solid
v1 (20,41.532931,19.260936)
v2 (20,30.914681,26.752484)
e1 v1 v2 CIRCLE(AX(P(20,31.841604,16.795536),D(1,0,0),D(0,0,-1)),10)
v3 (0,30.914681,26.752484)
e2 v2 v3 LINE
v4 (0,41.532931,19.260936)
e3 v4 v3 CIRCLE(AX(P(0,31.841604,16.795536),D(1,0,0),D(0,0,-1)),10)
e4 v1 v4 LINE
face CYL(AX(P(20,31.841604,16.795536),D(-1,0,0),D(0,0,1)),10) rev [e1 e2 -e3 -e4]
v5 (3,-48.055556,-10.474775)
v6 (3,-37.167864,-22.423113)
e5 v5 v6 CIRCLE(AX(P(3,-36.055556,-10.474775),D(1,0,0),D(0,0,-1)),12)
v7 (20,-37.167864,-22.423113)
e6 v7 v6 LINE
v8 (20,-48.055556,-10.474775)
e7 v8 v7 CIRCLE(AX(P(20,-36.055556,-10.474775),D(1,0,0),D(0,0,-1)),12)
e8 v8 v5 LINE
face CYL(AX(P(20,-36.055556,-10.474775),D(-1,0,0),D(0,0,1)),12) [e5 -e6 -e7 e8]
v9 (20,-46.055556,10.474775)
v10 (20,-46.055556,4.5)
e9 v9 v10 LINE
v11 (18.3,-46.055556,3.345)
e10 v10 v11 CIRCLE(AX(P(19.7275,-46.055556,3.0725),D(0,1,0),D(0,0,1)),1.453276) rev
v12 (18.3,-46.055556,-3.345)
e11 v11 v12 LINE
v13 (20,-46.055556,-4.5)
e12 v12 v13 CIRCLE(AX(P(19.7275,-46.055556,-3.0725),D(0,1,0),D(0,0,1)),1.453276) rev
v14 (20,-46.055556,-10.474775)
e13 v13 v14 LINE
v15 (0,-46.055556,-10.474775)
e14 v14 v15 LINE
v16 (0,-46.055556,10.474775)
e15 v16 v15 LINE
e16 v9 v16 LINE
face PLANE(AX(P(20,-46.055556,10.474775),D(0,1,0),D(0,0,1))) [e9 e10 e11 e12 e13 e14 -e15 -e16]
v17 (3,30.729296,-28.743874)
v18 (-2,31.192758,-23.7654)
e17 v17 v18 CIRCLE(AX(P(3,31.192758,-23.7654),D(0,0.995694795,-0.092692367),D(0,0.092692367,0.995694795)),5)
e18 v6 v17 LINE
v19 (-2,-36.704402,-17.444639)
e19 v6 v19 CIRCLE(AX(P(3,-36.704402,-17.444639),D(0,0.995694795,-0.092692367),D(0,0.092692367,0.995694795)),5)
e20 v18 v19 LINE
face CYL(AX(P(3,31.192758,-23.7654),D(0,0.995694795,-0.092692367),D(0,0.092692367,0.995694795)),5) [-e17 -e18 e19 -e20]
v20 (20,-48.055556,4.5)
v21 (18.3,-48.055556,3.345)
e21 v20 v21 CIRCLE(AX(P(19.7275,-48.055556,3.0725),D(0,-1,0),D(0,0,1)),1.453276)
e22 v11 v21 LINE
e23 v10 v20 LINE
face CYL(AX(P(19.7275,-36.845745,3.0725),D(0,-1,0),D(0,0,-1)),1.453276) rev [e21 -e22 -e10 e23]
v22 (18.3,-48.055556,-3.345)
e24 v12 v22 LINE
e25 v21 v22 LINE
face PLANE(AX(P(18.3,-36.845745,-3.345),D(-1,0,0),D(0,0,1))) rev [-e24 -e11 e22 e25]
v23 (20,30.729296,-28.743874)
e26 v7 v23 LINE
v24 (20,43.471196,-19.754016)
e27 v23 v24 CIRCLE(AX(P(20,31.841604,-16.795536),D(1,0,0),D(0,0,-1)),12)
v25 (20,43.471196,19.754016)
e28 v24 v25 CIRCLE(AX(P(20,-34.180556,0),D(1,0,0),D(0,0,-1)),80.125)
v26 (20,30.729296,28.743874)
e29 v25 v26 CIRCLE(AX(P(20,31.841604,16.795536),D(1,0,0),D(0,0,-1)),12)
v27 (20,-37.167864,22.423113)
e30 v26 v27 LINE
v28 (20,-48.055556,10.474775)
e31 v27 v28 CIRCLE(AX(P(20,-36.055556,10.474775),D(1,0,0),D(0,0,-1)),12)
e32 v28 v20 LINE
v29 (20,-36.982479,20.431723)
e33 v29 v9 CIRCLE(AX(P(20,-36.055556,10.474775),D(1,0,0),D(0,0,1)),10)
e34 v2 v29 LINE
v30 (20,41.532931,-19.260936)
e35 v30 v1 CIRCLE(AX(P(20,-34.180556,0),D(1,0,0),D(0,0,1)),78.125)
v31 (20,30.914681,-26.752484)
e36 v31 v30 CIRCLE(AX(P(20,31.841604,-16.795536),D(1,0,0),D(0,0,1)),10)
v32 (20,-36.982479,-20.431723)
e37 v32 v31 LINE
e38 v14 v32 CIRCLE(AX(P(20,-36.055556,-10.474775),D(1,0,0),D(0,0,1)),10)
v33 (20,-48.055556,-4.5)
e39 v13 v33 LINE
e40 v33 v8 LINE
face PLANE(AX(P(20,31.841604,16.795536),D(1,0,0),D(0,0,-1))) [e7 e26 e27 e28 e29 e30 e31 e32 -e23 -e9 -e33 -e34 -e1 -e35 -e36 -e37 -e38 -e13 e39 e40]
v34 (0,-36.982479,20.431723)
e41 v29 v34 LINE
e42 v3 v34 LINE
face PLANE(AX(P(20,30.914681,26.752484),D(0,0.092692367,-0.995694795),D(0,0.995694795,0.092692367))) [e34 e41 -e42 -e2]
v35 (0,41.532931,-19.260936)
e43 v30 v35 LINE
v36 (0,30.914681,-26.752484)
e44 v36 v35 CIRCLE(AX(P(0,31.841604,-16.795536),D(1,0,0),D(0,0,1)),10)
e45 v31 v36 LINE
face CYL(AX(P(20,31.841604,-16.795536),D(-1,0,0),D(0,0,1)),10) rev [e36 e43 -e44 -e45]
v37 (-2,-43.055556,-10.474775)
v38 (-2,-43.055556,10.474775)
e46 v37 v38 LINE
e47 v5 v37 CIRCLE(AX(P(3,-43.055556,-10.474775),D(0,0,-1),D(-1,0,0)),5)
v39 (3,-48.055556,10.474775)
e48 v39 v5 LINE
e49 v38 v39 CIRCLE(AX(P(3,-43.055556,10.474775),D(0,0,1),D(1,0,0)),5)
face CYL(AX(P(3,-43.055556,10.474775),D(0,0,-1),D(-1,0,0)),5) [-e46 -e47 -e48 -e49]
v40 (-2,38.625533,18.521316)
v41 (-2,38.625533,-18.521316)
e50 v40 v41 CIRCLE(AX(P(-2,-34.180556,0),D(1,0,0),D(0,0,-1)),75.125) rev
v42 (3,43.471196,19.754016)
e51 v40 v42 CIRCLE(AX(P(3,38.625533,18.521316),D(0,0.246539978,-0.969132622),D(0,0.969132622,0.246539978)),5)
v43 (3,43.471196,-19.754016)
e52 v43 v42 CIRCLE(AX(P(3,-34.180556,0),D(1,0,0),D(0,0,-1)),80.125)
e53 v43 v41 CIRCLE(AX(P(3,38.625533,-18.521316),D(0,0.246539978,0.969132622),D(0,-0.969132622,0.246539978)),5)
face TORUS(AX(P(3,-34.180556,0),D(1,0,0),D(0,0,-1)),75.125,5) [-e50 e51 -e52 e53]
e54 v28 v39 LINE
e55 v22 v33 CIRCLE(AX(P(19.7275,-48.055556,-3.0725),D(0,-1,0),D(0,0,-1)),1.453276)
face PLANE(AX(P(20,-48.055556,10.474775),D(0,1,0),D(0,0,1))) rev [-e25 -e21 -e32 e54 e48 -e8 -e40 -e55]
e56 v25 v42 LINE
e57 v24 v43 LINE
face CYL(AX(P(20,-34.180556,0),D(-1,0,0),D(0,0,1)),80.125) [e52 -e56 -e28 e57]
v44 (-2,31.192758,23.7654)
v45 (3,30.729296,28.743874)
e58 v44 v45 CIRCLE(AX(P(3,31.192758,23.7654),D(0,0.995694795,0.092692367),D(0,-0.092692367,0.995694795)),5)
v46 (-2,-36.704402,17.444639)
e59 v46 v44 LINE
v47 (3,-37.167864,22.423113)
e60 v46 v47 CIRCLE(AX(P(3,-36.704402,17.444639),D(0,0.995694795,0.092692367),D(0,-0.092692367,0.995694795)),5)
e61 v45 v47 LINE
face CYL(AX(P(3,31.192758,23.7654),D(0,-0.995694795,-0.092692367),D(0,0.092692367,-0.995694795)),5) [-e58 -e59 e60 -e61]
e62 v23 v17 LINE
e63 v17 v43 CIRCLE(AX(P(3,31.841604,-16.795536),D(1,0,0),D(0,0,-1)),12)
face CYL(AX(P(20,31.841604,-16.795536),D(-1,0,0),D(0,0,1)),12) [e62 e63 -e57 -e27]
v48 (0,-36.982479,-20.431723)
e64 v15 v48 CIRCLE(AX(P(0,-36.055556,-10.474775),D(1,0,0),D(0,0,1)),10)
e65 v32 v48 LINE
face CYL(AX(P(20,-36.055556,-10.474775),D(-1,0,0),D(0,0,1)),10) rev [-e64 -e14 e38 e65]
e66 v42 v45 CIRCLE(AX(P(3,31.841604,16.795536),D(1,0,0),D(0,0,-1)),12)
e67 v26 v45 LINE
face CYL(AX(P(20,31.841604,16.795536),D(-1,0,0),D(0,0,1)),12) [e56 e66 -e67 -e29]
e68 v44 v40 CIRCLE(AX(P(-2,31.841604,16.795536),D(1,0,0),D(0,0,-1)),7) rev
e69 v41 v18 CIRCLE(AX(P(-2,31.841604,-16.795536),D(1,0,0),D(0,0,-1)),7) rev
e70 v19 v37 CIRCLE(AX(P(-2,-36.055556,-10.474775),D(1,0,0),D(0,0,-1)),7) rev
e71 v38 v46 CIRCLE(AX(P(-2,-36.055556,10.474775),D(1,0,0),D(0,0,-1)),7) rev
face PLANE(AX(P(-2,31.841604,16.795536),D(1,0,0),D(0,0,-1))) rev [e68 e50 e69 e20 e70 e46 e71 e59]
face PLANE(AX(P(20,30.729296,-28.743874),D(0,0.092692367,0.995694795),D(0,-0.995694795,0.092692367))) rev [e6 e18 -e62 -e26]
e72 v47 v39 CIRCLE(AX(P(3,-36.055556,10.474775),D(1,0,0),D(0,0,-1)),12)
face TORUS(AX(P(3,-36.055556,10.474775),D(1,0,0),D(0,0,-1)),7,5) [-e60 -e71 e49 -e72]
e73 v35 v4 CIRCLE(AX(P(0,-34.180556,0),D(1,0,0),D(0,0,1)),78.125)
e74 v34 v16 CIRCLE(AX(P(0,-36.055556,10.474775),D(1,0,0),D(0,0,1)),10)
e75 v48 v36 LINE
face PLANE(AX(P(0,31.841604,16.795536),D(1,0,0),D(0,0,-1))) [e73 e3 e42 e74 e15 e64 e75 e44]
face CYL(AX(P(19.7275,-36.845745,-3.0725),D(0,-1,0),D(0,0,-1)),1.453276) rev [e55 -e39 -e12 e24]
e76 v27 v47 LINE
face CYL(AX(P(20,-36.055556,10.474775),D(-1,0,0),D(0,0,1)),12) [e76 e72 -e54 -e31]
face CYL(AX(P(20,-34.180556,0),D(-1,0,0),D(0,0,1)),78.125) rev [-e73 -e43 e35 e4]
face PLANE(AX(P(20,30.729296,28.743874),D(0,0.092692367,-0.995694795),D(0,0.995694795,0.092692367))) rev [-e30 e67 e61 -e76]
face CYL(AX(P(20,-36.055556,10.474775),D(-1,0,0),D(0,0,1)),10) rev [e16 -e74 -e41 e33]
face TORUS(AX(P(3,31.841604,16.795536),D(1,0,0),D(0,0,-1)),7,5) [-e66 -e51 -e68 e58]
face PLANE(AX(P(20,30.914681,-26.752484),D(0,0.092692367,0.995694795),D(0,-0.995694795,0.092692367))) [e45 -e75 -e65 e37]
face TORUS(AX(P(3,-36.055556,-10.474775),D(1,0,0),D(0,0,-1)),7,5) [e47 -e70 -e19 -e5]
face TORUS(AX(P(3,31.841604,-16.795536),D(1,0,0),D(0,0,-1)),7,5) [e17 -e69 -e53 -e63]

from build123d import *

# Parameters (mm, degrees)
BOSS_EXTRUDE1_DEPTH = 20
SHELL4_T            = 2
FILLET2_R           = 5
CUT_EXTRUDE1_DEPTH  = 2


with BuildPart() as part:
    # Sketch2 → Boss-Extrude1 (new body)
    with BuildSketch(Plane(origin=(0, 0, 0), x_dir=(0, 0, -1), z_dir=(1, 0, 0))):
        with BuildLine():
            Line((-26.752483981, 30.914680653), (-20.431723376, -36.982479222))
            ThreePointArc((-20.431723376, -36.982479222), (-17.210158239, -43.447078966), (-10.474775424, -46.055555556))
            Line((-10.474775424, -46.055555556), (10.474775424, -46.055555556))
            ThreePointArc((10.474775424, -46.055555556), (17.210158239, -43.447078966), (20.431723376, -36.982479222))
            Line((20.431723376, -36.982479222), (26.752483981, 30.914680653))
            ThreePointArc((26.752483981, 30.914680653), (24.966551173, 37.606542438), (19.260935813, 41.532930539))
            ThreePointArc((19.260935813, 41.532930539), (0, 43.944444444), (-19.260935813, 41.532930539))
            ThreePointArc((-19.260935813, 41.532930539), (-24.966551173, 37.606542438), (-26.752483981, 30.914680653))
        make_face()
    extrude(amount=BOSS_EXTRUDE1_DEPTH)

    # Shell4
    shell4_openings = [part.faces().sort_by_distance(p)[0] for p in [
        (20, 0.813945533, 0),
    ]]
    offset(amount=SHELL4_T, openings=shell4_openings, kind=Kind.INTERSECTION)

    # Fillet2
    # the kernel refuses this fillet: 5 mm, written as the material it takes off along each edge
    with BuildSketch(Plane(origin=(-2, -48.055555556, 10.474775424), x_dir=(1, 0, 0), z_dir=(0, 0, -1))) as fillet2_piece_1:
        with BuildLine():
            CenterArc((FILLET2_R, -FILLET2_R), FILLET2_R, 90, 90)
            Line((0, -FILLET2_R), (0, 0))
            Line((0, 0), (FILLET2_R, 0))
        make_face()
    extrude(amount=20.949550847, mode=Mode.SUBTRACT)
    with BuildSketch(Plane(origin=(-2, -36.055555556, 10.474775424), x_dir=(0, -1, 0), z_dir=(0, 0, -1))) as fillet2_piece_2:
        with BuildLine():
            CenterArc((12 - FILLET2_R, -FILLET2_R), FILLET2_R, 0, 90)
            Line((12 - FILLET2_R, 0), (12, 0))
            Line((12, 0), (12, -FILLET2_R))
        make_face()
    revolve(axis=Axis((-2, -36.055555556, 10.474775424), (-1, 0, 0)), revolution_arc=84.681483972, mode=Mode.SUBTRACT)
    with BuildSketch(Plane(origin=(-2, 30.729295919, 28.743873571), x_dir=(1, 0, 0), z_dir=(0, -0.9956947951896508, -0.09269236663414848)), Plane(origin=(-2, -37.167863955, -22.423112966), x_dir=(1, 0, 0), z_dir=(0, 0.9956947951896508, -0.09269236663414848))) as fillet2_piece_3:
        with BuildLine():
            CenterArc((FILLET2_R, -FILLET2_R), FILLET2_R, 90, 90)
            Line((0, -FILLET2_R), (0, 0))
            Line((0, 0), (FILLET2_R, 0))
        make_face()
    extrude(amount=68.190734955, mode=Mode.SUBTRACT)
    with BuildSketch(Plane(origin=(-2, 31.841604319, 16.795536029), x_dir=(0, -0.09269236663414838, 0.9956947951896509), z_dir=(0, -0.9956947951896509, -0.09269236663414838))) as fillet2_piece_4:
        with BuildLine():
            CenterArc((12 - FILLET2_R, -FILLET2_R), FILLET2_R, 0, 90)
            Line((12 - FILLET2_R, 0), (12, 0))
            Line((12, 0), (12, -FILLET2_R))
        make_face()
    revolve(axis=Axis((-2, 31.841604319, 16.795536029), (-1, 0, 0)), revolution_arc=81.045656085, mode=Mode.SUBTRACT)
    with BuildSketch(Plane(origin=(-2, -34.180555556, 0), x_dir=(0, 0.9691326220109027, 0.2465399784097355), z_dir=(0, -0.2465399784097355, 0.9691326220109027))) as fillet2_piece_5:
        with BuildLine():
            CenterArc((80.125 - FILLET2_R, -FILLET2_R), FILLET2_R, 0, 90)
            Line((80.125 - FILLET2_R, 0), (80.125, 0))
            Line((80.125, 0), (80.125, -FILLET2_R))
        make_face()
    revolve(axis=Axis((-2, -34.180555556, 0), (-1, 0, 0)), revolution_arc=28.545719886, mode=Mode.SUBTRACT)
    with BuildSketch(Plane(origin=(-2, 31.841604319, -16.795536029), x_dir=(0, 0.9691326220109029, -0.24653997840973443), z_dir=(0, 0.24653997840973443, 0.9691326220109029))) as fillet2_piece_6:
        with BuildLine():
            CenterArc((12 - FILLET2_R, -FILLET2_R), FILLET2_R, 0, 90)
            Line((12 - FILLET2_R, 0), (12, 0))
            Line((12, 0), (12, -FILLET2_R))
        make_face()
    revolve(axis=Axis((-2, 31.841604319, -16.795536029), (-1, 0, 0)), revolution_arc=81.045656085, mode=Mode.SUBTRACT)
    with BuildSketch(Plane(origin=(-2, -36.055555556, -10.474775424), x_dir=(0, -0.09269236663414783, -0.9956947951896509), z_dir=(0, 0.9956947951896509, -0.09269236663414783))) as fillet2_piece_7:
        with BuildLine():
            CenterArc((12 - FILLET2_R, -FILLET2_R), FILLET2_R, 0, 90)
            Line((12 - FILLET2_R, 0), (12, 0))
            Line((12, 0), (12, -FILLET2_R))
        make_face()
    revolve(axis=Axis((-2, -36.055555556, -10.474775424), (-1, 0, 0)), revolution_arc=84.681483972, mode=Mode.SUBTRACT)

    # Sketch3 → Cut-Extrude1 (cut)
    with BuildSketch(Plane.XZ.offset(48.055555556)):
        with BuildLine():
            Line((20, -4.5), (20, 4.5))
            ThreePointArc((20, 4.5), (18.910791668, 4.274581528), (18.3, 3.345))
            Line((18.3, 3.345), (18.3, -3.345))
            ThreePointArc((18.3, -3.345), (18.910791668, -4.274581528), (20, -4.5))
        make_face()
    extrude(amount=-CUT_EXTRUDE1_DEPTH, mode=Mode.SUBTRACT)


solid = part.part
